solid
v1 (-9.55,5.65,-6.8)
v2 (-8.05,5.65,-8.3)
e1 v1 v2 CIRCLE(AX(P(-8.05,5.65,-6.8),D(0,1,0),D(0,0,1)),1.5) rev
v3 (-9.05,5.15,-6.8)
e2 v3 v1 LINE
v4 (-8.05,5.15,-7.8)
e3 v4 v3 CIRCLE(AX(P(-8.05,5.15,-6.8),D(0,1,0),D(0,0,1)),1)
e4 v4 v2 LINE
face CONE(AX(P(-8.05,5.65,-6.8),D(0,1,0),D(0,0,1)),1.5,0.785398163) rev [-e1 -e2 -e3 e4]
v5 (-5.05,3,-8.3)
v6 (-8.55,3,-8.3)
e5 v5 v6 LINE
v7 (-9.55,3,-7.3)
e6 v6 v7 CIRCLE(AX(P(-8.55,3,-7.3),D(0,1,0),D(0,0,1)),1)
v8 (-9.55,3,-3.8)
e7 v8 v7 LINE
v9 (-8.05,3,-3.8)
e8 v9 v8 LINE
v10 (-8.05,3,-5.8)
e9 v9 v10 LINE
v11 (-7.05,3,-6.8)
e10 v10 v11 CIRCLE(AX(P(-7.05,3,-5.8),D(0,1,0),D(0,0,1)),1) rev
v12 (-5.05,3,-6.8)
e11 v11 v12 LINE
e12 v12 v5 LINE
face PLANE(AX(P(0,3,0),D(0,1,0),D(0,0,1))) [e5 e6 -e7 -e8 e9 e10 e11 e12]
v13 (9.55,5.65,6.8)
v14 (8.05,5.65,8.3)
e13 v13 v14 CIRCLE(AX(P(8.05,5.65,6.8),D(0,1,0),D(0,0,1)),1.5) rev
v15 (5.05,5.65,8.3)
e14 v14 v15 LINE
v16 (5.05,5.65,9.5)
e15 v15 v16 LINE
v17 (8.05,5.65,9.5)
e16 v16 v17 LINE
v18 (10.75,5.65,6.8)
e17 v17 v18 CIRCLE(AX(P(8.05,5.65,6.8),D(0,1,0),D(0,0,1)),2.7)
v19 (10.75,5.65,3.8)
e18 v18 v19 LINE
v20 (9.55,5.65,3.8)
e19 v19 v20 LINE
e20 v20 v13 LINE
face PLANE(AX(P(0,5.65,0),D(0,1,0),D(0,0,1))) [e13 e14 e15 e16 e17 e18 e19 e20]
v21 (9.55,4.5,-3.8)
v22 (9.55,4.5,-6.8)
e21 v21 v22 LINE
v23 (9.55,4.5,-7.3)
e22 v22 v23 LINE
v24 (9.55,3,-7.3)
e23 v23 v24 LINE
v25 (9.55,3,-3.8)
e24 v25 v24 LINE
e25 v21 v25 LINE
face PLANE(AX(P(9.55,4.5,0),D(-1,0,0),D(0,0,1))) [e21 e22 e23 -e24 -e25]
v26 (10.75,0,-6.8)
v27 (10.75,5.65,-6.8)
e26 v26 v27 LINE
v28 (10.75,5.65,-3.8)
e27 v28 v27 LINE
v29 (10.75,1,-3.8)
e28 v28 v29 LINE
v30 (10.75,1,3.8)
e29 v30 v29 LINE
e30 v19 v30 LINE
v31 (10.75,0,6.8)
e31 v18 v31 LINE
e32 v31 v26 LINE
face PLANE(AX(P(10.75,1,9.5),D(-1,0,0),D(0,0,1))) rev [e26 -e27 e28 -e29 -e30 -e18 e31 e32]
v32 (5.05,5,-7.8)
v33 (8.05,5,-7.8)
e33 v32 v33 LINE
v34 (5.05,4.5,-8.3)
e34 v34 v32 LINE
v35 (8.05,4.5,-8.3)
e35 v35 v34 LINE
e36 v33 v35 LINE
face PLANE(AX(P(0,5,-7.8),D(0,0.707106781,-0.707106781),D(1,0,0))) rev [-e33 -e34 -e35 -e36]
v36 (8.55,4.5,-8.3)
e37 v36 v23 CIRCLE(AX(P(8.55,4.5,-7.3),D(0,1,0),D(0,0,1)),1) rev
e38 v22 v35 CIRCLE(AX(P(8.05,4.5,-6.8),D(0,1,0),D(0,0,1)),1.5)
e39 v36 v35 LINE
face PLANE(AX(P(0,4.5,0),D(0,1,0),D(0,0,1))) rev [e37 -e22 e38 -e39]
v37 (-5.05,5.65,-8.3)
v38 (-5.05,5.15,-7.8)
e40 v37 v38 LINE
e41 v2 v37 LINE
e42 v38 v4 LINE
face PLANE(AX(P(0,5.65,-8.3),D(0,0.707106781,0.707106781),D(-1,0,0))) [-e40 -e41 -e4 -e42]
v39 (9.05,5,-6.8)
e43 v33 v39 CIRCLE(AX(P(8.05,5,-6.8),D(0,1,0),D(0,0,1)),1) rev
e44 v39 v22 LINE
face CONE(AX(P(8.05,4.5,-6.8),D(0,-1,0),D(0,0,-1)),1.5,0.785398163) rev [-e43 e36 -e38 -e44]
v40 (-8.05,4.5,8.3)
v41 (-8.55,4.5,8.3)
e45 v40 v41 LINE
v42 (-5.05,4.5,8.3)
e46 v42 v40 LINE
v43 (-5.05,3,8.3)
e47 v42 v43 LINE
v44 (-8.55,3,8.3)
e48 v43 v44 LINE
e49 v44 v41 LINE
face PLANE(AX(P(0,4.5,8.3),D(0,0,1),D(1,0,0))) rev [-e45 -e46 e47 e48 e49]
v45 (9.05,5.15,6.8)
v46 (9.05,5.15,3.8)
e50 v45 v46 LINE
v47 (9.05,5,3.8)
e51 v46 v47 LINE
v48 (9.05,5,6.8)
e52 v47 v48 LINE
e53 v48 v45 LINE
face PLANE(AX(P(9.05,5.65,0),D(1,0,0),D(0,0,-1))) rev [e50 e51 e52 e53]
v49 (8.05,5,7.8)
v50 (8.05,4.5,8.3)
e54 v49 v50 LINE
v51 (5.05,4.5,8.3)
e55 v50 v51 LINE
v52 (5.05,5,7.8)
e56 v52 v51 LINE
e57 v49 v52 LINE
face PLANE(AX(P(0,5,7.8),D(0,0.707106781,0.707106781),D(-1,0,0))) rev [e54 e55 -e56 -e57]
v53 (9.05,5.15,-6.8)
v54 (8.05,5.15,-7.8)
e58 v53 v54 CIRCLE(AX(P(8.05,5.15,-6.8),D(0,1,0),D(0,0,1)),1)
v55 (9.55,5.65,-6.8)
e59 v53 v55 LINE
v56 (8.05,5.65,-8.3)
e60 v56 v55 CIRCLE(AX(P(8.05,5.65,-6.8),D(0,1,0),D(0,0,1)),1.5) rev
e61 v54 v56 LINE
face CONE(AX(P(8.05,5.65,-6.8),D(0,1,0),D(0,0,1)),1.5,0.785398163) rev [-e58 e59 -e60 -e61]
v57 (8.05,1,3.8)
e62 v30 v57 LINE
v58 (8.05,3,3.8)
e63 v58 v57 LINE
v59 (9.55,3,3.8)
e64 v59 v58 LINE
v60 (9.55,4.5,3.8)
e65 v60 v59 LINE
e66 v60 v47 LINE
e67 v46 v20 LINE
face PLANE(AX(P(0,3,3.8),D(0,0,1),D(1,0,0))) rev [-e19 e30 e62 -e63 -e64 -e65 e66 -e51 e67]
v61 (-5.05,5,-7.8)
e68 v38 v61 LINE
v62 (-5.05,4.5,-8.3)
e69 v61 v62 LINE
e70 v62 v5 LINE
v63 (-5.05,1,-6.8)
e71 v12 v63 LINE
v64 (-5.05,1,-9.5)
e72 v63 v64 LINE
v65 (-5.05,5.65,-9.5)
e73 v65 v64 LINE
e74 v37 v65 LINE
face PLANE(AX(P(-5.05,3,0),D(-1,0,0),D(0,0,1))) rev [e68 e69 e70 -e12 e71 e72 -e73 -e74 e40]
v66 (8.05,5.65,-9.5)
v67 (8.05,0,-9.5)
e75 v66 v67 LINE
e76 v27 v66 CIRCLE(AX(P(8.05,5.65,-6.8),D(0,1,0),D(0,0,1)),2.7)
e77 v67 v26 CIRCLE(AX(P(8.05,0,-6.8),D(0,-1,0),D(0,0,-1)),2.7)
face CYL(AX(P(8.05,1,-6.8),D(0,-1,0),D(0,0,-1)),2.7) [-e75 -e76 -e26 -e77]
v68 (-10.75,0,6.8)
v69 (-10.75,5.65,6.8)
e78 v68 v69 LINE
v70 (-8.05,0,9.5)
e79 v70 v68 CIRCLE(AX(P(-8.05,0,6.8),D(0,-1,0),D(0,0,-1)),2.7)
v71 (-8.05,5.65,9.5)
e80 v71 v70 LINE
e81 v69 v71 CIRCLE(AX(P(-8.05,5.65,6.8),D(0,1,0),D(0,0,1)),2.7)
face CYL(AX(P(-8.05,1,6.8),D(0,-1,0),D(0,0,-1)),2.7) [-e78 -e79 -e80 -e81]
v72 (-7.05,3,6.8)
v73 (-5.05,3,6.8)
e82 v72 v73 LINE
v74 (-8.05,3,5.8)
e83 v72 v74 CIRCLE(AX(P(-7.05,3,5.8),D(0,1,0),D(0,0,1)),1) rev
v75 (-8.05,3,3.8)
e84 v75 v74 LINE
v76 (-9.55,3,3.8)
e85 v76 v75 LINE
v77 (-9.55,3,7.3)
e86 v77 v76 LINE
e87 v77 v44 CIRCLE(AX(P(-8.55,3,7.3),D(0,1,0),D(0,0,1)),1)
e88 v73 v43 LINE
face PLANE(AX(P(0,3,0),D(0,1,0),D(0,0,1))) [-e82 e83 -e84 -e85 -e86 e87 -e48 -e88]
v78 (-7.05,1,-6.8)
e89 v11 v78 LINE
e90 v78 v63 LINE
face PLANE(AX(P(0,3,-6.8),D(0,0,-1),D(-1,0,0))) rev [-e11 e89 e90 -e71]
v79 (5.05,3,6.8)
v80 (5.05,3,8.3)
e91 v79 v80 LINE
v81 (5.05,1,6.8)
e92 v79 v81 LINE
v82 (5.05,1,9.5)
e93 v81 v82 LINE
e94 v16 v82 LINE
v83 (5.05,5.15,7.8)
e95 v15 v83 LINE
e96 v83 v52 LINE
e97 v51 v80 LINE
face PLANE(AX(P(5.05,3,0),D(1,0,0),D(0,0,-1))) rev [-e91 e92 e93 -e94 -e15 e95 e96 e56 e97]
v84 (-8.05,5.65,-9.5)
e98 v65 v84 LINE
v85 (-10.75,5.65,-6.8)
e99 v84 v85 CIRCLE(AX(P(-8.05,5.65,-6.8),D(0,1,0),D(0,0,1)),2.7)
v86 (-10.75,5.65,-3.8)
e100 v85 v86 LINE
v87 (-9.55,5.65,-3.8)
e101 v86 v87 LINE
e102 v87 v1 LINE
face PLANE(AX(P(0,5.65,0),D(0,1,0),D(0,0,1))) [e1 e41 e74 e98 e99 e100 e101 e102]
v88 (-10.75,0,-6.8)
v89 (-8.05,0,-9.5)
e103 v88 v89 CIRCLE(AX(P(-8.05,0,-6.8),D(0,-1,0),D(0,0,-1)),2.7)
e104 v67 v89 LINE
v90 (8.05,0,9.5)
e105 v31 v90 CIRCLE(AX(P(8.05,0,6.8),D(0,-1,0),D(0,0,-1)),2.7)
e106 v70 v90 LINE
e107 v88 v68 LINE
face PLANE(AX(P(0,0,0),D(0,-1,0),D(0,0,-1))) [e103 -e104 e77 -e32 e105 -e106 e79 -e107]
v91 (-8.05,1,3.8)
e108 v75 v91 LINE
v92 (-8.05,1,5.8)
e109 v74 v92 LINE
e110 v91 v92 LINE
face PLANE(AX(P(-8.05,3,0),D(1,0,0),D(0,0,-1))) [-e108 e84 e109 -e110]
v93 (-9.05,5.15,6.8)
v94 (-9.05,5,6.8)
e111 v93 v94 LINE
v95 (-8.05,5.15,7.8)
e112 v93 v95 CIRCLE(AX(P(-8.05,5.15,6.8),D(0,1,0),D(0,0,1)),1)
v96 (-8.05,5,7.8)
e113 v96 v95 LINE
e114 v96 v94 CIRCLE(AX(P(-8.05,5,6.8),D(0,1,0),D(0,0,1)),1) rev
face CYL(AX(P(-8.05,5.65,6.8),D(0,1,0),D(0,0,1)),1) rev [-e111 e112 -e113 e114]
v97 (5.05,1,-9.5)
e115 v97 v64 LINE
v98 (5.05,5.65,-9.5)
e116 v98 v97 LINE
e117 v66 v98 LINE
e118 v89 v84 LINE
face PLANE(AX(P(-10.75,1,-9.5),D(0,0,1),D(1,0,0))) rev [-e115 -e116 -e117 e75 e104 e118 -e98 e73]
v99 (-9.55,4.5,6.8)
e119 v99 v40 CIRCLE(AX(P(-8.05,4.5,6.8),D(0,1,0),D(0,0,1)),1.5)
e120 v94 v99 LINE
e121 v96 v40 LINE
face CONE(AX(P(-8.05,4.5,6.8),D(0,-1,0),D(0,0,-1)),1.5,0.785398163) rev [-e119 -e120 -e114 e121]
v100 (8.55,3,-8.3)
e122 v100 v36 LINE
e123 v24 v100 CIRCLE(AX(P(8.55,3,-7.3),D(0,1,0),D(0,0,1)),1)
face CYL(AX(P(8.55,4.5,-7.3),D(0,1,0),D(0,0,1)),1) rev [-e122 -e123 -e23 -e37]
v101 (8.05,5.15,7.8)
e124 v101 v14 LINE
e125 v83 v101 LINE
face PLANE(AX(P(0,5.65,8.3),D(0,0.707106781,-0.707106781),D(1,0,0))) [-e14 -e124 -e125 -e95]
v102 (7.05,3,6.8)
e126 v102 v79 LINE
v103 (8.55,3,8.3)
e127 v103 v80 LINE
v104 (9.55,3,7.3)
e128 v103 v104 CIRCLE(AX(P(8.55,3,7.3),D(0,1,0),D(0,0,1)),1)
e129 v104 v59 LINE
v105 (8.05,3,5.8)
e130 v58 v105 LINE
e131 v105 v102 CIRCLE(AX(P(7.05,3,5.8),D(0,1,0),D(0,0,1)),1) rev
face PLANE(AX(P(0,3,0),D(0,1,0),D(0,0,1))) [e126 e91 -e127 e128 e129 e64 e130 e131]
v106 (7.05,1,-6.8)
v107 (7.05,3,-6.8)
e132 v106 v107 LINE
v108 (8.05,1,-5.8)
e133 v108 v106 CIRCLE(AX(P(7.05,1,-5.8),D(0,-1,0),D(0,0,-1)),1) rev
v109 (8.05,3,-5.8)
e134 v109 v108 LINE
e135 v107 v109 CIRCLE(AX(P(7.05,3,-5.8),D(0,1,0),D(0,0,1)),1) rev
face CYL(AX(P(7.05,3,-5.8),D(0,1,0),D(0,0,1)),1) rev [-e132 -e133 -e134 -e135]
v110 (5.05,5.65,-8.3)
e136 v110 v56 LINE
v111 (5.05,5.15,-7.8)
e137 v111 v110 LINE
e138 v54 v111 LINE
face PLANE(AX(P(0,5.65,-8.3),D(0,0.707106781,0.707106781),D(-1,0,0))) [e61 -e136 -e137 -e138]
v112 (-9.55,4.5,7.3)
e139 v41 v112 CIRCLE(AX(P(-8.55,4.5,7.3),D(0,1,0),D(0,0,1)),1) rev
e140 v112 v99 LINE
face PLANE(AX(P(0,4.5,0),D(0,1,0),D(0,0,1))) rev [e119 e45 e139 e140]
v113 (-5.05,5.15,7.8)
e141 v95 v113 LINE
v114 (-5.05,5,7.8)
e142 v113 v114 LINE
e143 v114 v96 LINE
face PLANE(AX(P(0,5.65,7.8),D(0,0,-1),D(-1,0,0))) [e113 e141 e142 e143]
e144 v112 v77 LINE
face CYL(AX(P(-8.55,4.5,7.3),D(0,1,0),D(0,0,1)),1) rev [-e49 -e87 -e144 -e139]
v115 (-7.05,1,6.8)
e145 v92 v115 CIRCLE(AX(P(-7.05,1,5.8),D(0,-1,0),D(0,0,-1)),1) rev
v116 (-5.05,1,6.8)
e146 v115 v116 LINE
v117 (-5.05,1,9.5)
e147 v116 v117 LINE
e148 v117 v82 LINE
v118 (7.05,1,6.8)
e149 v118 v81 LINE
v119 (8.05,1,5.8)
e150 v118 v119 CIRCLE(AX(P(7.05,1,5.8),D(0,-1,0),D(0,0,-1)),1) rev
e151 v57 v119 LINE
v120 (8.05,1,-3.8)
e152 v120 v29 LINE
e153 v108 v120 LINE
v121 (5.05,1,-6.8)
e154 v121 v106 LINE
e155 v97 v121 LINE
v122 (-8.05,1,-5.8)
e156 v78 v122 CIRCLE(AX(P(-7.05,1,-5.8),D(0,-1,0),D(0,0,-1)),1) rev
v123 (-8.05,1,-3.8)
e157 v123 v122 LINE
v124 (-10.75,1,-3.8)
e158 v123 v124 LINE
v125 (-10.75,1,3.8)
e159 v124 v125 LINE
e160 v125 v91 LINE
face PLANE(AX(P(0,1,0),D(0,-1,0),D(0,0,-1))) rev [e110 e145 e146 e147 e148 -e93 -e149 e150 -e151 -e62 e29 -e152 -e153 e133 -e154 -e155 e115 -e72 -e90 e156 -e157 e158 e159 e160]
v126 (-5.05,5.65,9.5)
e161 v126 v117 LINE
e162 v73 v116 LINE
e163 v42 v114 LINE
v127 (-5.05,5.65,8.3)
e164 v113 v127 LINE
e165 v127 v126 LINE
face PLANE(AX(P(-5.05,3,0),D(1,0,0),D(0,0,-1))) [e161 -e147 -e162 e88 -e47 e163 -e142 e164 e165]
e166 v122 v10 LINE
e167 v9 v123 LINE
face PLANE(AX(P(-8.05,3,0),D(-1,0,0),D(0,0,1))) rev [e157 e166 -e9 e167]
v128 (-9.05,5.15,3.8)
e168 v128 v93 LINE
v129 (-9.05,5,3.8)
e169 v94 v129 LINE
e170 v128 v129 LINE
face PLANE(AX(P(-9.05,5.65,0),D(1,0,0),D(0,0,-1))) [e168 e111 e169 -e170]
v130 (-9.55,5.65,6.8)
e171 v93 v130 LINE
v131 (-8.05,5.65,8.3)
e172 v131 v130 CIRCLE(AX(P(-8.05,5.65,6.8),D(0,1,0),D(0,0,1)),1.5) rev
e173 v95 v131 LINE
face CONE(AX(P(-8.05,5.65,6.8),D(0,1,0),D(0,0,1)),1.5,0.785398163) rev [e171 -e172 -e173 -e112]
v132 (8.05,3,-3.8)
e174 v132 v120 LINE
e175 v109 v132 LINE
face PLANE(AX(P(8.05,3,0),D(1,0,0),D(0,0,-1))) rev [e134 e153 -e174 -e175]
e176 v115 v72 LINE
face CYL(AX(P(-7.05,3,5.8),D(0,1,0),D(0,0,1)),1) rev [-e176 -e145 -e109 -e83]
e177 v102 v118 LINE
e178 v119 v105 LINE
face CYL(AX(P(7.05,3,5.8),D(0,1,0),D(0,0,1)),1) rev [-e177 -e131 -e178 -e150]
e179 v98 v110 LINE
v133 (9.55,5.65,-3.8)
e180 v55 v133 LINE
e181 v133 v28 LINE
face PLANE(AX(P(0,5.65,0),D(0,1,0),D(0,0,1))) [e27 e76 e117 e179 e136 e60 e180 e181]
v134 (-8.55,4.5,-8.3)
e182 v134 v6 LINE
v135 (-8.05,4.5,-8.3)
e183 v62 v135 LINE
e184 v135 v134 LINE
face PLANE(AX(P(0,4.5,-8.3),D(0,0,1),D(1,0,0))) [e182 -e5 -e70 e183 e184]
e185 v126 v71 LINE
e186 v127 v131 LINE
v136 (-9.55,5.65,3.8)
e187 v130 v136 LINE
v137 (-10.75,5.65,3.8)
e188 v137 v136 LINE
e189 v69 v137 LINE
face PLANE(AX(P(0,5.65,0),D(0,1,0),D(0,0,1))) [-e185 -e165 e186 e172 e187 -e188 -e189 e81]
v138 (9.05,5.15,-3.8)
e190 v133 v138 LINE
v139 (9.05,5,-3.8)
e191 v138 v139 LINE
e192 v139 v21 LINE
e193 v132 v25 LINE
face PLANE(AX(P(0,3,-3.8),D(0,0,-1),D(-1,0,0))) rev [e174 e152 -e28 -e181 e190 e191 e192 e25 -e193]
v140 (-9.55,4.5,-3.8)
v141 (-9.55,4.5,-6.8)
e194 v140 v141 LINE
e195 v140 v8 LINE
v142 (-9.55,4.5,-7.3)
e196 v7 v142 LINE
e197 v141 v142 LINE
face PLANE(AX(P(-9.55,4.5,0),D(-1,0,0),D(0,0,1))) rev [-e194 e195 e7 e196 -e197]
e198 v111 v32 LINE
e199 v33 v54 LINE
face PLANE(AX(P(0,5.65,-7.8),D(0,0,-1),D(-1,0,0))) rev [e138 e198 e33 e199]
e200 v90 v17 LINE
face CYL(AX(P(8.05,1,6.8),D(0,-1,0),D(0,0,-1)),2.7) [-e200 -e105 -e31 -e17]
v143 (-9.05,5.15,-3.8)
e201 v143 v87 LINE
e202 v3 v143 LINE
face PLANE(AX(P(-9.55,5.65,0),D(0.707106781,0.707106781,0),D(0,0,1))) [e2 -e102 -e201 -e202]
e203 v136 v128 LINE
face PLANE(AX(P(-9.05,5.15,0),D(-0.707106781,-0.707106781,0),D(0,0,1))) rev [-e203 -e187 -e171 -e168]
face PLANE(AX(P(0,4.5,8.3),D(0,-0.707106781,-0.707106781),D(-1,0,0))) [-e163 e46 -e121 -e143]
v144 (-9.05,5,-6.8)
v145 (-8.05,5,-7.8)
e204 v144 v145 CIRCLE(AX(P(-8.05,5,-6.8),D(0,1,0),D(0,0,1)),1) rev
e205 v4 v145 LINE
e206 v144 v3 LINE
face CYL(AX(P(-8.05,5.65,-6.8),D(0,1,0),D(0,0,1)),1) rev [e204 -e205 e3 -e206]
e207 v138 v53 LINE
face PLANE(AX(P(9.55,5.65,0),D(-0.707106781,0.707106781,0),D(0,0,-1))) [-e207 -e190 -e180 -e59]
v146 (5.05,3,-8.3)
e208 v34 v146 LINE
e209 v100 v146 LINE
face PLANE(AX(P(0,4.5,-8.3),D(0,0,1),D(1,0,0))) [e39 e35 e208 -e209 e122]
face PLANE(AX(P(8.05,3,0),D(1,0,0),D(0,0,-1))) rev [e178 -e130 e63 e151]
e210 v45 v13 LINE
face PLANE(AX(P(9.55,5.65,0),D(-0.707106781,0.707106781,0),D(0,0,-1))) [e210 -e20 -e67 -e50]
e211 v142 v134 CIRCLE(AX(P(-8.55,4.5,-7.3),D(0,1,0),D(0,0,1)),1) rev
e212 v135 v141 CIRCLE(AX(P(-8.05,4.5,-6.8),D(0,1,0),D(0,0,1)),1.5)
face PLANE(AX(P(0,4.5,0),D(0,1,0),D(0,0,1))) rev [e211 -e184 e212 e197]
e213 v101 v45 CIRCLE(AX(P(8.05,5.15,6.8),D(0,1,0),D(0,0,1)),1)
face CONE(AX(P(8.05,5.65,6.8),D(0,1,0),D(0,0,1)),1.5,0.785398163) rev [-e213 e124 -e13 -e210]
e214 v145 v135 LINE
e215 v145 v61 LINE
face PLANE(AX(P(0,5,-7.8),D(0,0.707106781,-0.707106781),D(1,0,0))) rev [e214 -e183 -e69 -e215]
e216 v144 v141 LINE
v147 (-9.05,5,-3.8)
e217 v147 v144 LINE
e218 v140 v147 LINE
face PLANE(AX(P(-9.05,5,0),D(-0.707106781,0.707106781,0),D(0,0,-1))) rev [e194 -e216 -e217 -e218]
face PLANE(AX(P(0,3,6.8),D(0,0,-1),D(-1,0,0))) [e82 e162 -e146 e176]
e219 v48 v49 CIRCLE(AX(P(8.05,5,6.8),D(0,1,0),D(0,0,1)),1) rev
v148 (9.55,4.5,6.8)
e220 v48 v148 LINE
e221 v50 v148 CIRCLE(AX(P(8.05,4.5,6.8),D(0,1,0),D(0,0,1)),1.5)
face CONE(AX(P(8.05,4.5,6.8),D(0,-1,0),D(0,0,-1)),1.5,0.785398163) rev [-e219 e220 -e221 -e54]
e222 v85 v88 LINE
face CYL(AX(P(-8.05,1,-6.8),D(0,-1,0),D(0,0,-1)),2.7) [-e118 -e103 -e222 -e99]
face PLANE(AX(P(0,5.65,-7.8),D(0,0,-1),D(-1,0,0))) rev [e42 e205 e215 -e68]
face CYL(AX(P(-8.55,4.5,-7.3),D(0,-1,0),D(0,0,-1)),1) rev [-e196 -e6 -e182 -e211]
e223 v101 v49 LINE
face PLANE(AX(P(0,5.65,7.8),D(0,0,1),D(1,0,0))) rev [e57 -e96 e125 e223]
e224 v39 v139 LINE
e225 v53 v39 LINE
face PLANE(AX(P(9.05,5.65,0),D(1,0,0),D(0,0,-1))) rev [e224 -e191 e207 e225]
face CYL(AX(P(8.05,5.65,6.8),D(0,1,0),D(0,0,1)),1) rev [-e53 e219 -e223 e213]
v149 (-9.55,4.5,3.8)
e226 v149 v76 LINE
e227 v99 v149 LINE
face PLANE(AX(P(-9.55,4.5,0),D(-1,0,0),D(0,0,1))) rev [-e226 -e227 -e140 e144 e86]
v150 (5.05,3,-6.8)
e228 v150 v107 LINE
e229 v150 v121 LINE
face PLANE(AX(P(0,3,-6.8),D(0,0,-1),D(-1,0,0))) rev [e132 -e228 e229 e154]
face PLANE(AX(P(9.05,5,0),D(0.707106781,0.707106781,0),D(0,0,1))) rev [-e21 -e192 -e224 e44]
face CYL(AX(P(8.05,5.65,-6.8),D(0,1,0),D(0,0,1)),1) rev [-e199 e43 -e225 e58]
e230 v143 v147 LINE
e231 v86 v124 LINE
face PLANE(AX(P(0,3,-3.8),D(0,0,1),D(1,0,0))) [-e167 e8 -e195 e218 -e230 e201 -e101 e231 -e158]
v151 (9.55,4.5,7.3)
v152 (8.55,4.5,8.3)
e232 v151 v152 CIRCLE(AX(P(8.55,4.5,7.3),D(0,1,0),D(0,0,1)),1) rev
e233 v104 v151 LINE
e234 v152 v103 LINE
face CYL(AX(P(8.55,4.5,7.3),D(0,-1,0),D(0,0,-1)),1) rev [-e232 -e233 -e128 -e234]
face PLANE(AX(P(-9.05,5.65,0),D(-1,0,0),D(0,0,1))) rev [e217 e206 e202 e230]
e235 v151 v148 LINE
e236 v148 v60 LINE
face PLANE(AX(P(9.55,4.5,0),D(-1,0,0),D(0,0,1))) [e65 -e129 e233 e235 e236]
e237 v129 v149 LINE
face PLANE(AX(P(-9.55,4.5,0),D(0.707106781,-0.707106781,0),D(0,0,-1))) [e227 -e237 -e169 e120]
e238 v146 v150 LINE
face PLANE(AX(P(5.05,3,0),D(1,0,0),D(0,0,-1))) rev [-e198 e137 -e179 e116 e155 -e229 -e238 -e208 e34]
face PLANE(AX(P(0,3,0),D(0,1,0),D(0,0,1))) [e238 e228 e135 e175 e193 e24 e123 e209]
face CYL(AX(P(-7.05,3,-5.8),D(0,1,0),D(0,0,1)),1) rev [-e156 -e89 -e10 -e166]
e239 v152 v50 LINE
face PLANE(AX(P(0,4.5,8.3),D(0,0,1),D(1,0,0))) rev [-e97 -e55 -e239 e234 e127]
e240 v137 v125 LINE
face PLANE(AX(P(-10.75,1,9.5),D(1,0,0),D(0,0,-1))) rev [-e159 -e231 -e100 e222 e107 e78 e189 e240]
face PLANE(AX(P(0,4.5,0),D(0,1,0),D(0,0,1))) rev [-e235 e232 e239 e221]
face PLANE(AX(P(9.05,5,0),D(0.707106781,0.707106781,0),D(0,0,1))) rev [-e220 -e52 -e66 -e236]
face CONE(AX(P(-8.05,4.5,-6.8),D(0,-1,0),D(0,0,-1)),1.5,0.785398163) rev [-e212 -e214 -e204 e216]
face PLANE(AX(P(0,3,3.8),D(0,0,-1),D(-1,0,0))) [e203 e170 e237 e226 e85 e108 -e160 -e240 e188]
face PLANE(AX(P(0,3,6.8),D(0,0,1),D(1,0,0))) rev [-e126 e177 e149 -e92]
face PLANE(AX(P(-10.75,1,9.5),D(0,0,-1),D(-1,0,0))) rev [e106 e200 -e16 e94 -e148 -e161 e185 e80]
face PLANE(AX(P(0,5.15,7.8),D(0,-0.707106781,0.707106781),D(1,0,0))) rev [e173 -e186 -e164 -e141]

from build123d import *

# Parameters (mm, degrees)
SKETCH1_W              = 21.5
SKETCH1_H              = 19
COMBINE_BASE_DEPTH     = 1
STAND_OFFS_DEPTH       = 2
PCB_CONTAINERS_DEPTH   = 1.5
SNAP_INS_DEPTH         = 1.15
INSIDE_FILLETS_R       = 1
OUTSIDE_FILLETS_R      = 2.7
CLICK_IN_CHAMFERS_SIZE = 0.5
PULL_OUT_CHAMFERS_SIZE = 0.5


with BuildPart() as part:
    # Sketch1 → Combine Base (new body)
    with BuildSketch(Plane(origin=(0, 0, 0), x_dir=(1, 0, 0), z_dir=(0, 1, 0))):
        Rectangle(SKETCH1_W, SKETCH1_H)
    extrude(amount=COMBINE_BASE_DEPTH)

    # Sketch4 → Stand offs (add)
    with BuildSketch(Plane(origin=(0, 1, 0), x_dir=(1, 0, 0), z_dir=(0, 1, 0))):
        Polygon((-10.75, 3.8), (-8.05, 3.8), (-8.05, 6.8), (-5.05, 6.8), (-5.05, 9.5), (-10.75, 9.5), align=None)
        Polygon((-8.05, -3.8), (-10.75, -3.8), (-10.75, -9.5), (-5.05, -9.5), (-5.05, -6.8), (-8.05, -6.8), align=None)
        Polygon((5.05, -6.8), (5.05, -9.5), (10.75, -9.5), (10.75, -3.8), (8.05, -3.8), (8.05, -6.8), align=None)
        Polygon((10.75, 9.5), (5.05, 9.5), (5.05, 6.8), (8.05, 6.8), (8.05, 3.8), (10.75, 3.8), align=None)
    extrude(amount=STAND_OFFS_DEPTH)

    # Sketch5 → PCB Containers (add)
    with BuildSketch(Plane(origin=(0, 3, 0), x_dir=(1, 0, 0), z_dir=(0, 1, 0))):
        Polygon((-10.75, 3.8), (-9.55, 3.8), (-9.55, 8.3), (-5.05, 8.3), (-5.05, 9.5), (-10.75, 9.5), align=None)
        Polygon((9.55, 8.3), (9.55, 3.8), (10.75, 3.8), (10.75, 9.5), (5.05, 9.5), (5.05, 8.3), align=None)
        Polygon((9.55, -8.3), (5.05, -8.3), (5.05, -9.5), (10.75, -9.5), (10.75, -3.8), (9.55, -3.8), align=None)
        Polygon((-10.75, -9.5), (-5.05, -9.5), (-5.05, -8.3), (-9.55, -8.3), (-9.55, -3.8), (-10.75, -3.8), align=None)
    extrude(amount=PCB_CONTAINERS_DEPTH)

    # Sketch6 → Snap Ins (add)
    with BuildSketch(Plane(origin=(0, 4.5, 0), x_dir=(1, 0, 0), z_dir=(0, 1, 0))):
        Polygon((-5.05, 7.8), (-5.05, 9.5), (-10.75, 9.5), (-10.75, 3.8), (-9.05, 3.8), (-9.05, 7.8), align=None)
        Polygon((-9.05, -3.8), (-10.75, -3.8), (-10.75, -9.5), (-5.05, -9.5), (-5.05, -7.8), (-9.05, -7.8), align=None)
        Polygon((10.75, -9.5), (10.75, -3.8), (9.05, -3.8), (9.05, -7.8), (5.05, -7.8), (5.05, -9.5), align=None)
        Polygon((10.75, 9.5), (5.05, 9.5), (5.05, 7.8), (9.05, 7.8), (9.05, 3.8), (10.75, 3.8), align=None)
    extrude(amount=SNAP_INS_DEPTH)

    # Inside Fillets
    inside_fillets_edges = [part.edges().sort_by_distance(p)[0] for p in [
        (9.55, 3.75, -8.3),
        (9.55, 3.75, 8.3),
        (-9.55, 3.75, 8.3),
        (-9.05, 5.075, 7.8),
        (9.05, 5.075, 7.8),
        (-8.05, 2, -6.8),
        (9.05, 5.075, -7.8),
        (-9.05, 5.075, -7.8),
        (-8.05, 2, 6.8),
        (8.05, 2, 6.8),
        (8.05, 2, -6.8),
        (-9.55, 3.75, -8.3),
    ]]
    fillet(inside_fillets_edges, radius=INSIDE_FILLETS_R)

    # Outside Fillets
    outside_fillets_edges = [part.edges().sort_by_distance(p)[0] for p in [
        (10.75, 2.825, 9.5),
        (-10.75, 2.825, 9.5),
        (-10.75, 2.825, -9.5),
        (10.75, 2.825, -9.5),
    ]]
    fillet(outside_fillets_edges, radius=OUTSIDE_FILLETS_R)

    # Click in Chamfers
    click_in_chamfers_edges = [part.edges().sort_by_distance(p)[0] for p in [
        (-9.05, 5.65, 5.3),
        (9.05, 5.65, 5.3),
        (6.55, 5.65, -7.8),
        (-9.05, 5.65, -5.3),
        (6.55, 5.65, 7.8),
        (-6.55, 5.65, 7.8),
        (-6.55, 5.65, -7.8),
        (9.05, 5.65, -5.3),
        (8.757106781, 5.65, 7.507106781),
        (-8.757106781, 5.65, 7.507106781),
        (-8.757106781, 5.65, -7.507106781),
        (8.757106781, 5.65, -7.507106781),
    ]]
    chamfer(click_in_chamfers_edges, length=CLICK_IN_CHAMFERS_SIZE)

    # Pull out Chamfers
    pull_out_chamfers_edges = [part.edges().sort_by_distance(p)[0] for p in [
        (-6.55, 4.5, -7.8),
        (-9.05, 4.5, -5.3),
        (-8.757106781, 4.5, -7.507106781),
        (9.05, 4.5, -5.3),
        (6.55, 4.5, -7.8),
        (8.757106781, 4.5, -7.507106781),
        (6.55, 4.5, 7.8),
        (9.05, 4.5, 5.3),
        (8.757106781, 4.5, 7.507106781),
        (-9.05, 4.5, 5.3),
        (-6.55, 4.5, 7.8),
        (-8.757106781, 4.5, 7.507106781),
    ]]
    chamfer(pull_out_chamfers_edges, length=PULL_OUT_CHAMFERS_SIZE - 0.0001)  # a hair under: the kernel refuses the full size


solid = part.part
